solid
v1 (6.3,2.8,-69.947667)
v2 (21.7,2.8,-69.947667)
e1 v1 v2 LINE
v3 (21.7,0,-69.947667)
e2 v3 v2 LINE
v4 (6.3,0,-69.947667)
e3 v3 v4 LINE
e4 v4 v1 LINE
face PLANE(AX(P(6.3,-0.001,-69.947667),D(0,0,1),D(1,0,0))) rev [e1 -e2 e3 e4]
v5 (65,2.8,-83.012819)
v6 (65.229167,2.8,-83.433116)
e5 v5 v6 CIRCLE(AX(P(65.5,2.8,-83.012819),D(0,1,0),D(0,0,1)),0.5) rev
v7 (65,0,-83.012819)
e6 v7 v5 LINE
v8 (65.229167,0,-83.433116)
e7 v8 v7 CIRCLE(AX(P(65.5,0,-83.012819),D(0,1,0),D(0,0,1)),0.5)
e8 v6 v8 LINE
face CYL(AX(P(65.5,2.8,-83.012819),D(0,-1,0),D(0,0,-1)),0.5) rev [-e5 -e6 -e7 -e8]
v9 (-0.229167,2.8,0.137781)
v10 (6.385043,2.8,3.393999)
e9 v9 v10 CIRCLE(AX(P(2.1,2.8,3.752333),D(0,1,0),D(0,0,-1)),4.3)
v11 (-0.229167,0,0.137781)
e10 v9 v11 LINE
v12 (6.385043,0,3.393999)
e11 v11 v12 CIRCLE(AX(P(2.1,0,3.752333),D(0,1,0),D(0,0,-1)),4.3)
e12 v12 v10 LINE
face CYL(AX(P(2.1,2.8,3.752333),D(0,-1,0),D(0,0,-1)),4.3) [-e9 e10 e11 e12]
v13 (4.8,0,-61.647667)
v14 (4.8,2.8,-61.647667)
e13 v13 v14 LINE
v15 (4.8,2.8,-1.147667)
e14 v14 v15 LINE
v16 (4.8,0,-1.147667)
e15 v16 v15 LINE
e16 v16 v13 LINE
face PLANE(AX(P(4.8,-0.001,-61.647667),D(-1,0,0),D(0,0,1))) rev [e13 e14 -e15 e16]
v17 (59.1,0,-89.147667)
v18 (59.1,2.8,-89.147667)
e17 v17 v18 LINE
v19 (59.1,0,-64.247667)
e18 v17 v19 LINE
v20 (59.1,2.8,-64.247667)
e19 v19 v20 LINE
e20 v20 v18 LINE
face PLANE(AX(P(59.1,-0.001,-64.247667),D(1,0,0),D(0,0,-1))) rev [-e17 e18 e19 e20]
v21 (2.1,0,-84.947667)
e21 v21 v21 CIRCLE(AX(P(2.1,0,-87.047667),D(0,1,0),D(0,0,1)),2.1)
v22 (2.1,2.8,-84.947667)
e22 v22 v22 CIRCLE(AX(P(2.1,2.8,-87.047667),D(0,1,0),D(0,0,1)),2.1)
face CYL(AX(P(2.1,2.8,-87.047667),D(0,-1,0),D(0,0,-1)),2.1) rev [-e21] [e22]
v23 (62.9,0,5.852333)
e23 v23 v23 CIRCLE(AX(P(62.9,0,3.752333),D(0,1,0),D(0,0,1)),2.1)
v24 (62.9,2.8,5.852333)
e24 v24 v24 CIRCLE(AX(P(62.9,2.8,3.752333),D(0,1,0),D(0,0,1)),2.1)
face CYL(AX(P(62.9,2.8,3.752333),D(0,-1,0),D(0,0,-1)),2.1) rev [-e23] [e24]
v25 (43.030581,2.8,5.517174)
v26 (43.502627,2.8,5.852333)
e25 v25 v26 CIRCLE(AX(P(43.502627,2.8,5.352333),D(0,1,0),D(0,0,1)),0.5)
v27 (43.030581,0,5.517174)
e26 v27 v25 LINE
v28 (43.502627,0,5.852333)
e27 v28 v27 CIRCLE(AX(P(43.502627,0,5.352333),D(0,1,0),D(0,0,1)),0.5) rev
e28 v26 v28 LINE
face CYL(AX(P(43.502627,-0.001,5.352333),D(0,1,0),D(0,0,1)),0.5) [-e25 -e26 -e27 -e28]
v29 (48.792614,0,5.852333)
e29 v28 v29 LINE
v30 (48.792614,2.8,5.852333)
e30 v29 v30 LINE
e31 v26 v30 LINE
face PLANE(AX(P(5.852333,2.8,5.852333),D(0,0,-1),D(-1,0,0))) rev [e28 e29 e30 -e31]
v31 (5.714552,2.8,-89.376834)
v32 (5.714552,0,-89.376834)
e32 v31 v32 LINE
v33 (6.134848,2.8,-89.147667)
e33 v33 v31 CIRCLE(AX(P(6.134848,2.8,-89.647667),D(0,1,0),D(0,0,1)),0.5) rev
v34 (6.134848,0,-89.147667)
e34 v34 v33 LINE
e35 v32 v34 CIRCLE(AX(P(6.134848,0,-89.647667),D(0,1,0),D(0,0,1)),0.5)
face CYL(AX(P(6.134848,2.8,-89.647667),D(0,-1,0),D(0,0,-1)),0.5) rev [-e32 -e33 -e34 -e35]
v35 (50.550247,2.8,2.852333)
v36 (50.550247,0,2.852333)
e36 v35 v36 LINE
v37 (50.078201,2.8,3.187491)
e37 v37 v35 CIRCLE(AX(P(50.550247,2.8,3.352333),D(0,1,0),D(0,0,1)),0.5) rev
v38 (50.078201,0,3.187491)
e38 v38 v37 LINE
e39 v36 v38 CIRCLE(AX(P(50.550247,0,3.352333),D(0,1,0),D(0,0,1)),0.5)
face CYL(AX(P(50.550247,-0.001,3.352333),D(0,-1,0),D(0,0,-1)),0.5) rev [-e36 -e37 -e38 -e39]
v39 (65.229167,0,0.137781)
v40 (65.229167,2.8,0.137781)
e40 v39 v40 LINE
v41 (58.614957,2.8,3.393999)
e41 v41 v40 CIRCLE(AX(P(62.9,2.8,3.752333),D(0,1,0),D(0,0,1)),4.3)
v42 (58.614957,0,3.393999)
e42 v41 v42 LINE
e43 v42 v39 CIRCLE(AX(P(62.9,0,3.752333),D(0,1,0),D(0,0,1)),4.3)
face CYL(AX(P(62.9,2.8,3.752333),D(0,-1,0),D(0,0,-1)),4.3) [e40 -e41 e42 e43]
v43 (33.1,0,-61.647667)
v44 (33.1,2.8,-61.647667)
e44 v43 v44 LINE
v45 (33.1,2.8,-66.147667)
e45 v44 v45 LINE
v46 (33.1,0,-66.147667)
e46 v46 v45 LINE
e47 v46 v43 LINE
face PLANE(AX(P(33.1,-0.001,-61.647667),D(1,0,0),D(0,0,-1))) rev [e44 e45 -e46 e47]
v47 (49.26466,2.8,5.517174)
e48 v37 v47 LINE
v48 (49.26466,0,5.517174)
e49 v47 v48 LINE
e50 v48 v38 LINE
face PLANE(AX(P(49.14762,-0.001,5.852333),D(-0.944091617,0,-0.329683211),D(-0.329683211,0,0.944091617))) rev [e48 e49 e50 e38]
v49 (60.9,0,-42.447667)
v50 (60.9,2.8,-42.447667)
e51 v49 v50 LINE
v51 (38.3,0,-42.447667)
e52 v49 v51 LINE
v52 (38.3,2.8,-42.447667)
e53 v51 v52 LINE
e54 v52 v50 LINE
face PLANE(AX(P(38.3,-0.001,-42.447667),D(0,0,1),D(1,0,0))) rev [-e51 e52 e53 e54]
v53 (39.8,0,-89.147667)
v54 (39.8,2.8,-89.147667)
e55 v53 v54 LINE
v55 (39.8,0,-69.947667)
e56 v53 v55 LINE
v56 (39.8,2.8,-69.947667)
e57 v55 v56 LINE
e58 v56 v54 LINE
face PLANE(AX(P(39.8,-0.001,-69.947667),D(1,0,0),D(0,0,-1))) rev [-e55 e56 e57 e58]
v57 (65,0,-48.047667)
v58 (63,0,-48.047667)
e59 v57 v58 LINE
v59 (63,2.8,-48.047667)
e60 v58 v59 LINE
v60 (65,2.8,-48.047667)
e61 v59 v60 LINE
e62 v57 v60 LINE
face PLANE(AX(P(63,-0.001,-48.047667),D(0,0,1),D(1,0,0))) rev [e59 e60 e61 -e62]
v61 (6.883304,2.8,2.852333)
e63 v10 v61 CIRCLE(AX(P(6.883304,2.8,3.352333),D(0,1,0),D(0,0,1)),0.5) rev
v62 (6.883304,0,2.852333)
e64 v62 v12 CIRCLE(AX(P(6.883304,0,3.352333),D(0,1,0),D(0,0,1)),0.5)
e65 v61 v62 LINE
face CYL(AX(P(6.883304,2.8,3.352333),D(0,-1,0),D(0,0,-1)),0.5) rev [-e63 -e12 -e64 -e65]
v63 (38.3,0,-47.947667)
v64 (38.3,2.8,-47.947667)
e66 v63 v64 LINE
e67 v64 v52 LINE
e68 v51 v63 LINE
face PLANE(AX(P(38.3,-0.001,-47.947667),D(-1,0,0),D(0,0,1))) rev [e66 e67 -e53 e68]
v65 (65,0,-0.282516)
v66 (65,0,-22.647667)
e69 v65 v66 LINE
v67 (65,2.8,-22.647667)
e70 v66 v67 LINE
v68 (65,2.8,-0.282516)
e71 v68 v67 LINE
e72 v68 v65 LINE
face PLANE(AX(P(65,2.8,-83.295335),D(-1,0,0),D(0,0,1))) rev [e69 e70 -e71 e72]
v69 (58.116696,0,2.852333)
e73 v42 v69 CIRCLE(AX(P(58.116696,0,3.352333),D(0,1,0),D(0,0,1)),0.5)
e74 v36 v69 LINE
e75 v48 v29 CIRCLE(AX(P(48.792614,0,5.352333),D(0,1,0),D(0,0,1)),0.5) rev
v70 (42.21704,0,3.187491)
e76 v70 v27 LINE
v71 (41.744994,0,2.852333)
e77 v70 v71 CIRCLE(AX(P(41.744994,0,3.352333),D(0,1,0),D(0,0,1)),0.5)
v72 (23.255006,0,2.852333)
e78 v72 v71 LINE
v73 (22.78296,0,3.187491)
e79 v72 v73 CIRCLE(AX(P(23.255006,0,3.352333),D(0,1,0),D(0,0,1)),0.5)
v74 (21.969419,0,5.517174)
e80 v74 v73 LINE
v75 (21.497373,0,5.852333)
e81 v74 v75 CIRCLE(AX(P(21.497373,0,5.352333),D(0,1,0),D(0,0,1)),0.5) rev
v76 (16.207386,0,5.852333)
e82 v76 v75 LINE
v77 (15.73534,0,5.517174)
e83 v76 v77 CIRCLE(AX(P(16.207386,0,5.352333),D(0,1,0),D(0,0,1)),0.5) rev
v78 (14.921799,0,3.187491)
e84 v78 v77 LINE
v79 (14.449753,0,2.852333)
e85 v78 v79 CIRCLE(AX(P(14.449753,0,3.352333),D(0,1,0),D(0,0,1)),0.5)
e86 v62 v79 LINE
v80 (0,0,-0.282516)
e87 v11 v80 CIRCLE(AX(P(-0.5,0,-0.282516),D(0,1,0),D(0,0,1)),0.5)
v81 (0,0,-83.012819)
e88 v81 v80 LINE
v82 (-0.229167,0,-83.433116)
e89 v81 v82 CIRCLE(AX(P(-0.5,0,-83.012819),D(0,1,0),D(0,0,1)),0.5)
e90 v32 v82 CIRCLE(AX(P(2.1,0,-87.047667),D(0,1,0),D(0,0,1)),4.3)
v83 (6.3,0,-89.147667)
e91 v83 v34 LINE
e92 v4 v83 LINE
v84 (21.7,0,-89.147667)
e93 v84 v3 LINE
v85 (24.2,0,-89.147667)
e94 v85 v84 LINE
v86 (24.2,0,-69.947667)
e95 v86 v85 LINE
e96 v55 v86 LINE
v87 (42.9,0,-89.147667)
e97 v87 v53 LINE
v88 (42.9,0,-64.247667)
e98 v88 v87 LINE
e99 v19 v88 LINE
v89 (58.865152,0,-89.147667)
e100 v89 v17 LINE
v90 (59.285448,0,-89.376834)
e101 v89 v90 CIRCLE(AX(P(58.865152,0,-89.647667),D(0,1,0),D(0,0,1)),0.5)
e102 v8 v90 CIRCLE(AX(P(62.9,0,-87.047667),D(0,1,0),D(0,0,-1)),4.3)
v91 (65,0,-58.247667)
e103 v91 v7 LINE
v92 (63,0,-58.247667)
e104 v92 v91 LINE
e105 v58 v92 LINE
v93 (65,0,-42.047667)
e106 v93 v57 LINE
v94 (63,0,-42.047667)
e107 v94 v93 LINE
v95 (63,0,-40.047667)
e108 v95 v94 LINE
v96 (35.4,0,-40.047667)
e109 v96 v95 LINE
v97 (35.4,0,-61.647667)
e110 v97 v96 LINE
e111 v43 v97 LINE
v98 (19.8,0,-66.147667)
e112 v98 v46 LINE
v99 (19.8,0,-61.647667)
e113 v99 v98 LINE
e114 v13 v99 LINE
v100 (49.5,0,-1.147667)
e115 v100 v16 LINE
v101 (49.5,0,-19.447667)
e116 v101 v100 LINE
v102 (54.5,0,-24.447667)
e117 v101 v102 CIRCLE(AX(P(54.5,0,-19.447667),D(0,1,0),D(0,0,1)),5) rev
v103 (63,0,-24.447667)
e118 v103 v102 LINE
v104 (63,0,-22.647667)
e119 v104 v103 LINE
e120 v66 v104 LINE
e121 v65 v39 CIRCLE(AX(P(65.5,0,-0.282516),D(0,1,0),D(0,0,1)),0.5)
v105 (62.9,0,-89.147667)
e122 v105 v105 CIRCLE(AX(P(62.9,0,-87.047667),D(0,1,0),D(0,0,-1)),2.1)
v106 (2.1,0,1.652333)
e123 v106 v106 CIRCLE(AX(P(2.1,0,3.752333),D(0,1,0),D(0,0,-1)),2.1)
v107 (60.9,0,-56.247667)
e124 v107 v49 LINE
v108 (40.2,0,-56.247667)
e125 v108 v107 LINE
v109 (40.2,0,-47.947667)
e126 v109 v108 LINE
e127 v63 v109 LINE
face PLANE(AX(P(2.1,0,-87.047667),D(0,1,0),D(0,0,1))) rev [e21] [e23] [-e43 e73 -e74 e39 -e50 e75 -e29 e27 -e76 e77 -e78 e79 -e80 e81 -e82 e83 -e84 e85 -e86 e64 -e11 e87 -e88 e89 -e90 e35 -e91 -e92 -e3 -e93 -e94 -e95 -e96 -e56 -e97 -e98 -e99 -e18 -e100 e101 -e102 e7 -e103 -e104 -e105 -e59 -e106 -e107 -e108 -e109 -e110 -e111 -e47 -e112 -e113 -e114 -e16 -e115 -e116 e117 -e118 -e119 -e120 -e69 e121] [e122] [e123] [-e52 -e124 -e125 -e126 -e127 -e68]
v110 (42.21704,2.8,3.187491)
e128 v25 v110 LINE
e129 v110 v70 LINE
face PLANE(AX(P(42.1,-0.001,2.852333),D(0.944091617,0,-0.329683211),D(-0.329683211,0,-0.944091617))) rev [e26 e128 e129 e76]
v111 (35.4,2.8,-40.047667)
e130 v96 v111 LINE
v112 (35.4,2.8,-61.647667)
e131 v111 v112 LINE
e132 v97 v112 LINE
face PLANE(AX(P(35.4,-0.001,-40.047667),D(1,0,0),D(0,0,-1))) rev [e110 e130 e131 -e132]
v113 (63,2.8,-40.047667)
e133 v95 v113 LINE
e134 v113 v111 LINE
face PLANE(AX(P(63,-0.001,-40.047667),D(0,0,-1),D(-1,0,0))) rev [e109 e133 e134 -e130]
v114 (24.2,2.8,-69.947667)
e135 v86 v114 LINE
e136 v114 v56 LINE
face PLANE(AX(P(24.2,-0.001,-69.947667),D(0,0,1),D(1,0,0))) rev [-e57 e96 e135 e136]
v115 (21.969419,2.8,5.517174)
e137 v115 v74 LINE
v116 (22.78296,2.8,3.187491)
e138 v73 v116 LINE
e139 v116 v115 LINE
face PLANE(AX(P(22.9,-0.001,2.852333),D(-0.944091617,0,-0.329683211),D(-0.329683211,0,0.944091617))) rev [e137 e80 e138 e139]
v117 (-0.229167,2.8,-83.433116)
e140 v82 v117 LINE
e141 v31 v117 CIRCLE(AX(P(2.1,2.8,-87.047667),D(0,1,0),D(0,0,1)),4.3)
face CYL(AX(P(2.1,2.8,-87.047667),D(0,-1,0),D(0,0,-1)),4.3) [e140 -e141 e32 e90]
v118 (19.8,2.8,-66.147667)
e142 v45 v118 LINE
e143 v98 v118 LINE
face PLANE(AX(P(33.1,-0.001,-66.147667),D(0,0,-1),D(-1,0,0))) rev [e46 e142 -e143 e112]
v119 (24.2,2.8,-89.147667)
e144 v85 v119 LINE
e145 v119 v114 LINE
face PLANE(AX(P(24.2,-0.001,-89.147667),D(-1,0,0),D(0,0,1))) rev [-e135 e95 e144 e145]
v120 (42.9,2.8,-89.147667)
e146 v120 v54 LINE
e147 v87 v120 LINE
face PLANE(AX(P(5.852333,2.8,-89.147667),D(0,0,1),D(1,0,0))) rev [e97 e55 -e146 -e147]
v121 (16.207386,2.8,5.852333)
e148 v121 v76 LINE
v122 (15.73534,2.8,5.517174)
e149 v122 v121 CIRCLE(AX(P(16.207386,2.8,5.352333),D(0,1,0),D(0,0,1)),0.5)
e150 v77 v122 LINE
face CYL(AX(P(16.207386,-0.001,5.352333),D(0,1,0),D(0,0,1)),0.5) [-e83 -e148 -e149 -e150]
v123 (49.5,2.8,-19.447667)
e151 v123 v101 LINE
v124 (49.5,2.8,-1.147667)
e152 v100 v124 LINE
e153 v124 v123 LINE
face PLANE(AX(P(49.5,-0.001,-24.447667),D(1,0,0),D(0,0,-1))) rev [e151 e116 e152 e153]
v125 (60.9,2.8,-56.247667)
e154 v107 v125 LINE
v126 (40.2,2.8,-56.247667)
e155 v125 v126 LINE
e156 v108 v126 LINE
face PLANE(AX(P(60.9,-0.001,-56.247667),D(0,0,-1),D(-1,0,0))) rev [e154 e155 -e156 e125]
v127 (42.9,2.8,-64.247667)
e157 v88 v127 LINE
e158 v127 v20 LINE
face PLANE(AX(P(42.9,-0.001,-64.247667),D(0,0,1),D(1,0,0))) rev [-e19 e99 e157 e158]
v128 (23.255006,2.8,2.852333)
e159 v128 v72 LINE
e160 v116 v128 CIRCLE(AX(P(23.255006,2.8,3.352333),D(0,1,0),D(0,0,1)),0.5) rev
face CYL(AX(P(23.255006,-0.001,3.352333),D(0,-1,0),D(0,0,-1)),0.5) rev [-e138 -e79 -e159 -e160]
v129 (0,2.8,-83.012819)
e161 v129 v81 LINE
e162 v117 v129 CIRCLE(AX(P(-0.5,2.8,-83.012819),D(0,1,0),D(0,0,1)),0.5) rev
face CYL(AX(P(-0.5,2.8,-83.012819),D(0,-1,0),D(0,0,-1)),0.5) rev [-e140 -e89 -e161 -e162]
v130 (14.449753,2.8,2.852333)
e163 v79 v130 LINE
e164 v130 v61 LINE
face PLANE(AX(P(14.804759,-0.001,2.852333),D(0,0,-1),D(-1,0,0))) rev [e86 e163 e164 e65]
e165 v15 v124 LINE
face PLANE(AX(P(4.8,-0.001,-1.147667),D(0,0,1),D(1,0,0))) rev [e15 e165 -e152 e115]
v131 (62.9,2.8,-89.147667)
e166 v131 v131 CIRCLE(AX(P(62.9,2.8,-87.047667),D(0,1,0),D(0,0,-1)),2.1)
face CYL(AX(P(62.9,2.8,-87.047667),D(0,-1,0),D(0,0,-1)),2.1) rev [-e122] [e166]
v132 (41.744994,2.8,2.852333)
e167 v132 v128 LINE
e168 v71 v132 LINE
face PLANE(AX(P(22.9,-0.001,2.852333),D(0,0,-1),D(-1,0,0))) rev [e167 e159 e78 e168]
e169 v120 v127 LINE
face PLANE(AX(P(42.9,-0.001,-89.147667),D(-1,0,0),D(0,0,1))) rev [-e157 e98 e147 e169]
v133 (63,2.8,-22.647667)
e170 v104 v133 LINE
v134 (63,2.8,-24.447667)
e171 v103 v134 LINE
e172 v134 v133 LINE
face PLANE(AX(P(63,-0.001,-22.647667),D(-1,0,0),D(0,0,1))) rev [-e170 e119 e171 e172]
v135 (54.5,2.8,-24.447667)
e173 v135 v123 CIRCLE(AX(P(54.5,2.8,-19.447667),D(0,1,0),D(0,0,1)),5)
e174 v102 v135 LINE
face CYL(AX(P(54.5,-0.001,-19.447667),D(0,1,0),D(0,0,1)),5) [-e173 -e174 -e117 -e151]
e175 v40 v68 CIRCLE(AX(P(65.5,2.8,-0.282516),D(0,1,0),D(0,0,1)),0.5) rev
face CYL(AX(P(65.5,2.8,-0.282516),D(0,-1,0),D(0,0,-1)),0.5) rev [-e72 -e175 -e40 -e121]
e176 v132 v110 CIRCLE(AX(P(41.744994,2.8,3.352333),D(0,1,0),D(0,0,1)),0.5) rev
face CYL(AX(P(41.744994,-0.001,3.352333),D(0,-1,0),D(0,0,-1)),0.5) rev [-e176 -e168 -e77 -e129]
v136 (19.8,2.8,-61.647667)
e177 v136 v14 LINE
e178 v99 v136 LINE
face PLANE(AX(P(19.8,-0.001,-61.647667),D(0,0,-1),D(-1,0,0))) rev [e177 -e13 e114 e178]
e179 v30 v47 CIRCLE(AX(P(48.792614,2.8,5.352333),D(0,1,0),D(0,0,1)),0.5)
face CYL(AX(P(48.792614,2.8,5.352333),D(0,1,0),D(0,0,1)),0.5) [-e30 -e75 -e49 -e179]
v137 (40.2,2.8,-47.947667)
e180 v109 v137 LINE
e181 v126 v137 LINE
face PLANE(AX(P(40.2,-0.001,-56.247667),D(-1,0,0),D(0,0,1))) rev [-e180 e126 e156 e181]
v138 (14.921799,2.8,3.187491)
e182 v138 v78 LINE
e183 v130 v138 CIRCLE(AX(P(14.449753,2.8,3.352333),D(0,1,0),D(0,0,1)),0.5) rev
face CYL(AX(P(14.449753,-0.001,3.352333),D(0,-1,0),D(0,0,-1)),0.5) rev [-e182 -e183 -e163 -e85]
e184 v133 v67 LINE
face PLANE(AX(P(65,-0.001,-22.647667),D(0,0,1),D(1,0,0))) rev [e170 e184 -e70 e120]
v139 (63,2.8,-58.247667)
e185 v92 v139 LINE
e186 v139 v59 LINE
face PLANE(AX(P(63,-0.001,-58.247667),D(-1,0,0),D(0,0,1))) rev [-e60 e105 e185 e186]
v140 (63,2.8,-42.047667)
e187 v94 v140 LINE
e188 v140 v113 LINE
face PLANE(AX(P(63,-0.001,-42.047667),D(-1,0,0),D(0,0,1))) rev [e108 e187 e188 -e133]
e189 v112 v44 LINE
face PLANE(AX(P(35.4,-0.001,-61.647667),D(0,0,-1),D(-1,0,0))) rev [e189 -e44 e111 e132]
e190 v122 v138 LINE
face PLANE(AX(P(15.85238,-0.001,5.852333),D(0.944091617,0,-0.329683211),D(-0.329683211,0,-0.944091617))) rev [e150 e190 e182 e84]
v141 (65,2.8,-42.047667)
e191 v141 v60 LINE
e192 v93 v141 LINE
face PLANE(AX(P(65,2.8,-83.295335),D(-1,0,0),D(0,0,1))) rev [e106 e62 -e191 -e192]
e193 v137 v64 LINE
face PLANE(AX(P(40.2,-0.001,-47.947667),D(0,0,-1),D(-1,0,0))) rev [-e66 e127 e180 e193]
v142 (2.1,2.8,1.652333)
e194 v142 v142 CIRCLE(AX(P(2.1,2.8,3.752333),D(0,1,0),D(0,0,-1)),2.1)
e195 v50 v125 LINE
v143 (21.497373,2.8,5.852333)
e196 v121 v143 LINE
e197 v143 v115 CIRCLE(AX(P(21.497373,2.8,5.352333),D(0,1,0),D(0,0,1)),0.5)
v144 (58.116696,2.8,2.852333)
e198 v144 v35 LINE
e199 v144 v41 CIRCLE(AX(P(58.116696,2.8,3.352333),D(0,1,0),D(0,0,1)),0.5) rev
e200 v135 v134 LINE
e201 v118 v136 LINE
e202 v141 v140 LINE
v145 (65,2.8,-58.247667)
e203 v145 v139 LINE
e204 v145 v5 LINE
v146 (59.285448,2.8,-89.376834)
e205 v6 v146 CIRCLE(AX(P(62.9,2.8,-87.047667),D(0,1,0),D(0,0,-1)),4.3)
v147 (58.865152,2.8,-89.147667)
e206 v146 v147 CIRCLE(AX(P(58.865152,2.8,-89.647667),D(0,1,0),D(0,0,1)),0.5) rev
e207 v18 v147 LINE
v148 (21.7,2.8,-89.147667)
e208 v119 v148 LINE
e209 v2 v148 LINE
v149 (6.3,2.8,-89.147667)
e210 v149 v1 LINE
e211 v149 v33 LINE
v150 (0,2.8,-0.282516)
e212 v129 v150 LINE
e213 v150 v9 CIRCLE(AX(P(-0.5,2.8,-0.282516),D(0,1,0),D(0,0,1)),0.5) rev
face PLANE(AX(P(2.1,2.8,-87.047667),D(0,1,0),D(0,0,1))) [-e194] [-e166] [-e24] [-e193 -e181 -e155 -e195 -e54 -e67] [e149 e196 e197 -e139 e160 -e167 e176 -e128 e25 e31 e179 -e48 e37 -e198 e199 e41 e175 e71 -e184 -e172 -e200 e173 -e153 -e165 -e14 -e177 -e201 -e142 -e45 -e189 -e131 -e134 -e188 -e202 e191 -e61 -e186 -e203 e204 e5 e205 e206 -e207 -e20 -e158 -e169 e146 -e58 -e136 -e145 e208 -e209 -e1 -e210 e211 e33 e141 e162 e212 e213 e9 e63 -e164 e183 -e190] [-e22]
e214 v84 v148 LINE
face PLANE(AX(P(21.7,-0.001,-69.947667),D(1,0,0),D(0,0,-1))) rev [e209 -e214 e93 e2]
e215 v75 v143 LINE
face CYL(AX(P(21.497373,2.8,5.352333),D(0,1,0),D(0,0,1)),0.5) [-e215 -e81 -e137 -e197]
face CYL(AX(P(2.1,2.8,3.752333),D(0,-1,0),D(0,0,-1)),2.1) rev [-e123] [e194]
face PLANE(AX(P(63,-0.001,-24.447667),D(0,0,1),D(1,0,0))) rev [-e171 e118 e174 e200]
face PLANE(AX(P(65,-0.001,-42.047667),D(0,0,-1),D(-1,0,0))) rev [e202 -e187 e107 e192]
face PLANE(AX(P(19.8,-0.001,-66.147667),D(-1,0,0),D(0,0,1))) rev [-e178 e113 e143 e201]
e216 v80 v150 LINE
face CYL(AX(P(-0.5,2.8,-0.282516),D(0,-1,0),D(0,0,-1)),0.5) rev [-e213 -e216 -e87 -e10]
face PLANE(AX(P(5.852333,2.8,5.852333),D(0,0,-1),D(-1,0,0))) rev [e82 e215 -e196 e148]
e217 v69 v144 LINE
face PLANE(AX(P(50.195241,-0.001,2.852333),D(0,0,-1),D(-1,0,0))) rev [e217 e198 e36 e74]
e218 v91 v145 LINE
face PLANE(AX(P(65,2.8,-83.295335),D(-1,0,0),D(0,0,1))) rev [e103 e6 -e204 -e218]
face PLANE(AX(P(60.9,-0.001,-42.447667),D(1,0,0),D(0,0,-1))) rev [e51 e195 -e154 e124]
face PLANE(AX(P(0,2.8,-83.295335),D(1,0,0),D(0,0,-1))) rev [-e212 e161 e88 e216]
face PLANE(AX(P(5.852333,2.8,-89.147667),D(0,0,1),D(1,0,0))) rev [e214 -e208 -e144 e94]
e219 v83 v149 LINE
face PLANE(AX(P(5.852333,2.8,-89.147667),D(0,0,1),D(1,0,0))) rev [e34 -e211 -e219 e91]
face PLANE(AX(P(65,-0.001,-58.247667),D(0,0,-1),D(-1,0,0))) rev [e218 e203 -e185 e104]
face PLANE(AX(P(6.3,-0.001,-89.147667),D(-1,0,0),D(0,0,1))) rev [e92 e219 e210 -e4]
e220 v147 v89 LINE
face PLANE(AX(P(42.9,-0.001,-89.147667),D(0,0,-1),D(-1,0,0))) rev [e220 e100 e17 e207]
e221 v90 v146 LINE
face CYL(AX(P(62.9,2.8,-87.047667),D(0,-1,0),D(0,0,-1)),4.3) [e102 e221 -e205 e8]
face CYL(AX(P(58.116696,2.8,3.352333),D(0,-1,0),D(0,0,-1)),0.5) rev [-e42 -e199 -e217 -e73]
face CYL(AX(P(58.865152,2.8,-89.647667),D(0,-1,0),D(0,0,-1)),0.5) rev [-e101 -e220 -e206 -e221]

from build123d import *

# Parameters (mm, degrees)
BASEPLATE_OUTLINE_R = 2.1
BASEPLATE_DEPTH     = 2.8
CUT_EXTRUDE1_REACH  = 115.438
SKETCH3_W           = 15.4
SKETCH3_H           = 19.2
SKETCH3_W_2         = 15.6
SKETCH3_W_3         = 16.2
SKETCH3_H_2         = 24.9
CUT_EXTRUDE2_REACH  = 115.438
SKETCH4_W           = 2
SKETCH4_H           = 10.2
FILLET1_R           = 5


# Read off the part's stored shape, not the designer's step: BasePlate
with BuildPart() as part:
    # BasePlate outline → BasePlate (new body)
    with BuildSketch(Plane(origin=(0, 0, 0), x_dir=(1, 0, 0), z_dir=(0, 1, 0))):
        with BuildLine():
            Line((43.502626614, -5.852332608), (48.792614178, -5.852332608))
            ThreePointArc((48.792614178, -5.852332608), (49.082078508, -5.760021707), (49.264659986, -5.517174213))
            Line((49.264659986, -5.517174213), (50.078201202, -3.187491002))
            ThreePointArc((50.078201202, -3.187491002), (50.26078268, -2.944643509), (50.55024701, -2.852332608))
            Line((50.55024701, -2.852332608), (58.116695703, -2.852332608))
            ThreePointArc((58.116695703, -2.852332608), (58.484685739, -3.013831008), (58.614956567, -3.393999275))
            ThreePointArc((58.614956567, -3.393999275), (64.799237397, -7.61016844), (65.229166667, -0.137781095))
            ThreePointArc((65.229166667, -0.137781095), (65.061014427, 0.043158816), (65, 0.282515593))
            Line((65, 0.282515593), (65, 83.012819192))
            ThreePointArc((65, 83.012819192), (65.061014427, 83.252175969), (65.229166667, 83.433115879))
            ThreePointArc((65.229166667, 83.433115879), (65.940559159, 90.088226551), (59.285448487, 89.376834059))
            ThreePointArc((59.285448487, 89.376834059), (59.104508577, 89.208681819), (58.8651518, 89.147667392))
            Line((58.8651518, 89.147667392), (6.1348482, 89.147667392))
            ThreePointArc((6.1348482, 89.147667392), (5.895491423, 89.208681819), (5.714551513, 89.376834059))
            ThreePointArc((5.714551513, 89.376834059), (-0.940559159, 90.088226551), (-0.229166667, 83.433115879))
            ThreePointArc((-0.229166667, 83.433115879), (-0.061014427, 83.252175969), (0, 83.012819192))
            Line((0, 83.012819192), (0, 0.282515593))
            ThreePointArc((0, 0.282515593), (-0.061014427, 0.043158816), (-0.229166667, -0.137781095))
            ThreePointArc((-0.229166667, -0.137781095), (0.200762603, -7.61016844), (6.385043433, -3.393999275))
            ThreePointArc((6.385043433, -3.393999275), (6.515314261, -3.013831008), (6.883304297, -2.852332608))
            Line((6.883304297, -2.852332608), (14.44975299, -2.852332608))
            ThreePointArc((14.44975299, -2.852332608), (14.73921732, -2.944643509), (14.921798798, -3.187491002))
            Line((14.921798798, -3.187491002), (15.735340014, -5.517174213))
            ThreePointArc((15.735340014, -5.517174213), (15.917921492, -5.760021707), (16.207385822, -5.852332608))
            Line((16.207385822, -5.852332608), (21.497373386, -5.852332608))
            ThreePointArc((21.497373386, -5.852332608), (21.786837716, -5.760021707), (21.969419194, -5.517174213))
            Line((21.969419194, -5.517174213), (22.78296041, -3.187491002))
            ThreePointArc((22.78296041, -3.187491002), (22.965541888, -2.944643509), (23.255006218, -2.852332608))
            Line((23.255006218, -2.852332608), (41.744993782, -2.852332608))
            ThreePointArc((41.744993782, -2.852332608), (42.034458112, -2.944643509), (42.21703959, -3.187491002))
            Line((42.21703959, -3.187491002), (43.030580806, -5.517174213))
            ThreePointArc((43.030580806, -5.517174213), (43.213162284, -5.760021707), (43.502626614, -5.852332608))
        make_face()
        with Locations((2.1, -3.752332608)):
            Circle(BASEPLATE_OUTLINE_R, mode=Mode.SUBTRACT)
        with Locations((62.9, -3.752332608)):
            Circle(BASEPLATE_OUTLINE_R, mode=Mode.SUBTRACT)
        with Locations((2.1, 87.047667392)):
            Circle(BASEPLATE_OUTLINE_R, mode=Mode.SUBTRACT)
        with Locations((62.9, 87.047667392)):
            Circle(BASEPLATE_OUTLINE_R, mode=Mode.SUBTRACT)
    extrude(amount=BASEPLATE_DEPTH)

    # Sketch3 → Cut-Extrude1 (cut, up to next)
    with BuildSketch(Plane(origin=(0, 2.8, 0), x_dir=(1, 0, 0), z_dir=(0, 1, 0)), mode=Mode.PRIVATE) as cut_extrude1_sk1:
        Polygon((4.8, 1.147667392), (49.5, 1.147667392), (49.5, 24.447667392), (63, 24.447667392), (63, 22.647667392), (65, 22.647667392), (65, 42.047667392), (63, 42.047667392), (63, 40.047667392), (35.4, 40.047667392), (35.4, 61.647667392), (33.1, 61.647667392), (33.1, 66.147667392), (19.8, 66.147667392), (19.8, 61.647667392), (4.8, 61.647667392), align=None)
    cut_extrude1_tool1 = extrude(cut_extrude1_sk1.sketch, amount=-CUT_EXTRUDE1_REACH, mode=Mode.PRIVATE) & part.part
    # Sketch3 → Cut-Extrude1 (cut, up to next)
    with BuildSketch(Plane(origin=(0, 2.8, 0), x_dir=(1, 0, 0), z_dir=(0, 1, 0)), mode=Mode.PRIVATE) as cut_extrude1_sk2:
        with Locations((14, 79.547667392)):
            Rectangle(SKETCH3_W, SKETCH3_H)
    cut_extrude1_tool2 = extrude(cut_extrude1_sk2.sketch, amount=-CUT_EXTRUDE1_REACH, mode=Mode.PRIVATE) & part.part
    # Sketch3 → Cut-Extrude1 (cut, up to next)
    with BuildSketch(Plane(origin=(0, 2.8, 0), x_dir=(1, 0, 0), z_dir=(0, 1, 0)), mode=Mode.PRIVATE) as cut_extrude1_sk3:
        with Locations((32, 79.547667392)):
            Rectangle(SKETCH3_W_2, SKETCH3_H)
    cut_extrude1_tool3 = extrude(cut_extrude1_sk3.sketch, amount=-CUT_EXTRUDE1_REACH, mode=Mode.PRIVATE) & part.part
    # Sketch3 → Cut-Extrude1 (cut, up to next)
    with BuildSketch(Plane(origin=(0, 2.8, 0), x_dir=(1, 0, 0), z_dir=(0, 1, 0)), mode=Mode.PRIVATE) as cut_extrude1_sk4:
        with Locations((51, 76.697667392)):
            Rectangle(SKETCH3_W_3, SKETCH3_H_2)
    cut_extrude1_tool4 = extrude(cut_extrude1_sk4.sketch, amount=-CUT_EXTRUDE1_REACH, mode=Mode.PRIVATE) & part.part
    add(cut_extrude1_tool1.solids().sort_by_distance((28.204461, 2.8, -30.008726))[0], mode=Mode.SUBTRACT)
    add(cut_extrude1_tool2.solids().sort_by_distance((14, 2.8, -79.547667))[0], mode=Mode.SUBTRACT)
    add(cut_extrude1_tool3.solids().sort_by_distance((32, 2.8, -79.547667))[0], mode=Mode.SUBTRACT)
    add(cut_extrude1_tool4.solids().sort_by_distance((51, 2.8, -76.697667))[0], mode=Mode.SUBTRACT)

    # Sketch4 → Cut-Extrude2 (cut, up to next)
    with BuildSketch(Plane(origin=(0, 2.8, 0), x_dir=(1, 0, 0), z_dir=(0, 1, 0)), mode=Mode.PRIVATE) as cut_extrude2_sk1:
        with Locations((64, 53.147667392)):
            Rectangle(SKETCH4_W, SKETCH4_H)
    cut_extrude2_tool1 = extrude(cut_extrude2_sk1.sketch, amount=-CUT_EXTRUDE2_REACH, mode=Mode.PRIVATE) & part.part
    # Sketch4 → Cut-Extrude2 (cut, up to next)
    with BuildSketch(Plane(origin=(0, 2.8, 0), x_dir=(1, 0, 0), z_dir=(0, 1, 0)), mode=Mode.PRIVATE) as cut_extrude2_sk2:
        Polygon((60.9, 56.247667392), (40.2, 56.247667392), (40.2, 47.947667392), (38.3, 47.947667392), (38.3, 42.447667392), (60.9, 42.447667392), (60.9, 50.047667392), align=None)
    cut_extrude2_tool2 = extrude(cut_extrude2_sk2.sketch, amount=-CUT_EXTRUDE2_REACH, mode=Mode.PRIVATE) & part.part
    add(cut_extrude2_tool1.solids().sort_by_distance((64, 2.8, -53.147667))[0], mode=Mode.SUBTRACT)
    add(cut_extrude2_tool2.solids().sort_by_distance((50.151212, 2.8, -49.20121))[0], mode=Mode.SUBTRACT)

    # Fillet1
    fillet1_edges = [part.edges().sort_by_distance(p)[0] for p in [
        (49.5, 1.4, -24.447667392),
    ]]
    fillet(fillet1_edges, radius=FILLET1_R)


solid = part.part
